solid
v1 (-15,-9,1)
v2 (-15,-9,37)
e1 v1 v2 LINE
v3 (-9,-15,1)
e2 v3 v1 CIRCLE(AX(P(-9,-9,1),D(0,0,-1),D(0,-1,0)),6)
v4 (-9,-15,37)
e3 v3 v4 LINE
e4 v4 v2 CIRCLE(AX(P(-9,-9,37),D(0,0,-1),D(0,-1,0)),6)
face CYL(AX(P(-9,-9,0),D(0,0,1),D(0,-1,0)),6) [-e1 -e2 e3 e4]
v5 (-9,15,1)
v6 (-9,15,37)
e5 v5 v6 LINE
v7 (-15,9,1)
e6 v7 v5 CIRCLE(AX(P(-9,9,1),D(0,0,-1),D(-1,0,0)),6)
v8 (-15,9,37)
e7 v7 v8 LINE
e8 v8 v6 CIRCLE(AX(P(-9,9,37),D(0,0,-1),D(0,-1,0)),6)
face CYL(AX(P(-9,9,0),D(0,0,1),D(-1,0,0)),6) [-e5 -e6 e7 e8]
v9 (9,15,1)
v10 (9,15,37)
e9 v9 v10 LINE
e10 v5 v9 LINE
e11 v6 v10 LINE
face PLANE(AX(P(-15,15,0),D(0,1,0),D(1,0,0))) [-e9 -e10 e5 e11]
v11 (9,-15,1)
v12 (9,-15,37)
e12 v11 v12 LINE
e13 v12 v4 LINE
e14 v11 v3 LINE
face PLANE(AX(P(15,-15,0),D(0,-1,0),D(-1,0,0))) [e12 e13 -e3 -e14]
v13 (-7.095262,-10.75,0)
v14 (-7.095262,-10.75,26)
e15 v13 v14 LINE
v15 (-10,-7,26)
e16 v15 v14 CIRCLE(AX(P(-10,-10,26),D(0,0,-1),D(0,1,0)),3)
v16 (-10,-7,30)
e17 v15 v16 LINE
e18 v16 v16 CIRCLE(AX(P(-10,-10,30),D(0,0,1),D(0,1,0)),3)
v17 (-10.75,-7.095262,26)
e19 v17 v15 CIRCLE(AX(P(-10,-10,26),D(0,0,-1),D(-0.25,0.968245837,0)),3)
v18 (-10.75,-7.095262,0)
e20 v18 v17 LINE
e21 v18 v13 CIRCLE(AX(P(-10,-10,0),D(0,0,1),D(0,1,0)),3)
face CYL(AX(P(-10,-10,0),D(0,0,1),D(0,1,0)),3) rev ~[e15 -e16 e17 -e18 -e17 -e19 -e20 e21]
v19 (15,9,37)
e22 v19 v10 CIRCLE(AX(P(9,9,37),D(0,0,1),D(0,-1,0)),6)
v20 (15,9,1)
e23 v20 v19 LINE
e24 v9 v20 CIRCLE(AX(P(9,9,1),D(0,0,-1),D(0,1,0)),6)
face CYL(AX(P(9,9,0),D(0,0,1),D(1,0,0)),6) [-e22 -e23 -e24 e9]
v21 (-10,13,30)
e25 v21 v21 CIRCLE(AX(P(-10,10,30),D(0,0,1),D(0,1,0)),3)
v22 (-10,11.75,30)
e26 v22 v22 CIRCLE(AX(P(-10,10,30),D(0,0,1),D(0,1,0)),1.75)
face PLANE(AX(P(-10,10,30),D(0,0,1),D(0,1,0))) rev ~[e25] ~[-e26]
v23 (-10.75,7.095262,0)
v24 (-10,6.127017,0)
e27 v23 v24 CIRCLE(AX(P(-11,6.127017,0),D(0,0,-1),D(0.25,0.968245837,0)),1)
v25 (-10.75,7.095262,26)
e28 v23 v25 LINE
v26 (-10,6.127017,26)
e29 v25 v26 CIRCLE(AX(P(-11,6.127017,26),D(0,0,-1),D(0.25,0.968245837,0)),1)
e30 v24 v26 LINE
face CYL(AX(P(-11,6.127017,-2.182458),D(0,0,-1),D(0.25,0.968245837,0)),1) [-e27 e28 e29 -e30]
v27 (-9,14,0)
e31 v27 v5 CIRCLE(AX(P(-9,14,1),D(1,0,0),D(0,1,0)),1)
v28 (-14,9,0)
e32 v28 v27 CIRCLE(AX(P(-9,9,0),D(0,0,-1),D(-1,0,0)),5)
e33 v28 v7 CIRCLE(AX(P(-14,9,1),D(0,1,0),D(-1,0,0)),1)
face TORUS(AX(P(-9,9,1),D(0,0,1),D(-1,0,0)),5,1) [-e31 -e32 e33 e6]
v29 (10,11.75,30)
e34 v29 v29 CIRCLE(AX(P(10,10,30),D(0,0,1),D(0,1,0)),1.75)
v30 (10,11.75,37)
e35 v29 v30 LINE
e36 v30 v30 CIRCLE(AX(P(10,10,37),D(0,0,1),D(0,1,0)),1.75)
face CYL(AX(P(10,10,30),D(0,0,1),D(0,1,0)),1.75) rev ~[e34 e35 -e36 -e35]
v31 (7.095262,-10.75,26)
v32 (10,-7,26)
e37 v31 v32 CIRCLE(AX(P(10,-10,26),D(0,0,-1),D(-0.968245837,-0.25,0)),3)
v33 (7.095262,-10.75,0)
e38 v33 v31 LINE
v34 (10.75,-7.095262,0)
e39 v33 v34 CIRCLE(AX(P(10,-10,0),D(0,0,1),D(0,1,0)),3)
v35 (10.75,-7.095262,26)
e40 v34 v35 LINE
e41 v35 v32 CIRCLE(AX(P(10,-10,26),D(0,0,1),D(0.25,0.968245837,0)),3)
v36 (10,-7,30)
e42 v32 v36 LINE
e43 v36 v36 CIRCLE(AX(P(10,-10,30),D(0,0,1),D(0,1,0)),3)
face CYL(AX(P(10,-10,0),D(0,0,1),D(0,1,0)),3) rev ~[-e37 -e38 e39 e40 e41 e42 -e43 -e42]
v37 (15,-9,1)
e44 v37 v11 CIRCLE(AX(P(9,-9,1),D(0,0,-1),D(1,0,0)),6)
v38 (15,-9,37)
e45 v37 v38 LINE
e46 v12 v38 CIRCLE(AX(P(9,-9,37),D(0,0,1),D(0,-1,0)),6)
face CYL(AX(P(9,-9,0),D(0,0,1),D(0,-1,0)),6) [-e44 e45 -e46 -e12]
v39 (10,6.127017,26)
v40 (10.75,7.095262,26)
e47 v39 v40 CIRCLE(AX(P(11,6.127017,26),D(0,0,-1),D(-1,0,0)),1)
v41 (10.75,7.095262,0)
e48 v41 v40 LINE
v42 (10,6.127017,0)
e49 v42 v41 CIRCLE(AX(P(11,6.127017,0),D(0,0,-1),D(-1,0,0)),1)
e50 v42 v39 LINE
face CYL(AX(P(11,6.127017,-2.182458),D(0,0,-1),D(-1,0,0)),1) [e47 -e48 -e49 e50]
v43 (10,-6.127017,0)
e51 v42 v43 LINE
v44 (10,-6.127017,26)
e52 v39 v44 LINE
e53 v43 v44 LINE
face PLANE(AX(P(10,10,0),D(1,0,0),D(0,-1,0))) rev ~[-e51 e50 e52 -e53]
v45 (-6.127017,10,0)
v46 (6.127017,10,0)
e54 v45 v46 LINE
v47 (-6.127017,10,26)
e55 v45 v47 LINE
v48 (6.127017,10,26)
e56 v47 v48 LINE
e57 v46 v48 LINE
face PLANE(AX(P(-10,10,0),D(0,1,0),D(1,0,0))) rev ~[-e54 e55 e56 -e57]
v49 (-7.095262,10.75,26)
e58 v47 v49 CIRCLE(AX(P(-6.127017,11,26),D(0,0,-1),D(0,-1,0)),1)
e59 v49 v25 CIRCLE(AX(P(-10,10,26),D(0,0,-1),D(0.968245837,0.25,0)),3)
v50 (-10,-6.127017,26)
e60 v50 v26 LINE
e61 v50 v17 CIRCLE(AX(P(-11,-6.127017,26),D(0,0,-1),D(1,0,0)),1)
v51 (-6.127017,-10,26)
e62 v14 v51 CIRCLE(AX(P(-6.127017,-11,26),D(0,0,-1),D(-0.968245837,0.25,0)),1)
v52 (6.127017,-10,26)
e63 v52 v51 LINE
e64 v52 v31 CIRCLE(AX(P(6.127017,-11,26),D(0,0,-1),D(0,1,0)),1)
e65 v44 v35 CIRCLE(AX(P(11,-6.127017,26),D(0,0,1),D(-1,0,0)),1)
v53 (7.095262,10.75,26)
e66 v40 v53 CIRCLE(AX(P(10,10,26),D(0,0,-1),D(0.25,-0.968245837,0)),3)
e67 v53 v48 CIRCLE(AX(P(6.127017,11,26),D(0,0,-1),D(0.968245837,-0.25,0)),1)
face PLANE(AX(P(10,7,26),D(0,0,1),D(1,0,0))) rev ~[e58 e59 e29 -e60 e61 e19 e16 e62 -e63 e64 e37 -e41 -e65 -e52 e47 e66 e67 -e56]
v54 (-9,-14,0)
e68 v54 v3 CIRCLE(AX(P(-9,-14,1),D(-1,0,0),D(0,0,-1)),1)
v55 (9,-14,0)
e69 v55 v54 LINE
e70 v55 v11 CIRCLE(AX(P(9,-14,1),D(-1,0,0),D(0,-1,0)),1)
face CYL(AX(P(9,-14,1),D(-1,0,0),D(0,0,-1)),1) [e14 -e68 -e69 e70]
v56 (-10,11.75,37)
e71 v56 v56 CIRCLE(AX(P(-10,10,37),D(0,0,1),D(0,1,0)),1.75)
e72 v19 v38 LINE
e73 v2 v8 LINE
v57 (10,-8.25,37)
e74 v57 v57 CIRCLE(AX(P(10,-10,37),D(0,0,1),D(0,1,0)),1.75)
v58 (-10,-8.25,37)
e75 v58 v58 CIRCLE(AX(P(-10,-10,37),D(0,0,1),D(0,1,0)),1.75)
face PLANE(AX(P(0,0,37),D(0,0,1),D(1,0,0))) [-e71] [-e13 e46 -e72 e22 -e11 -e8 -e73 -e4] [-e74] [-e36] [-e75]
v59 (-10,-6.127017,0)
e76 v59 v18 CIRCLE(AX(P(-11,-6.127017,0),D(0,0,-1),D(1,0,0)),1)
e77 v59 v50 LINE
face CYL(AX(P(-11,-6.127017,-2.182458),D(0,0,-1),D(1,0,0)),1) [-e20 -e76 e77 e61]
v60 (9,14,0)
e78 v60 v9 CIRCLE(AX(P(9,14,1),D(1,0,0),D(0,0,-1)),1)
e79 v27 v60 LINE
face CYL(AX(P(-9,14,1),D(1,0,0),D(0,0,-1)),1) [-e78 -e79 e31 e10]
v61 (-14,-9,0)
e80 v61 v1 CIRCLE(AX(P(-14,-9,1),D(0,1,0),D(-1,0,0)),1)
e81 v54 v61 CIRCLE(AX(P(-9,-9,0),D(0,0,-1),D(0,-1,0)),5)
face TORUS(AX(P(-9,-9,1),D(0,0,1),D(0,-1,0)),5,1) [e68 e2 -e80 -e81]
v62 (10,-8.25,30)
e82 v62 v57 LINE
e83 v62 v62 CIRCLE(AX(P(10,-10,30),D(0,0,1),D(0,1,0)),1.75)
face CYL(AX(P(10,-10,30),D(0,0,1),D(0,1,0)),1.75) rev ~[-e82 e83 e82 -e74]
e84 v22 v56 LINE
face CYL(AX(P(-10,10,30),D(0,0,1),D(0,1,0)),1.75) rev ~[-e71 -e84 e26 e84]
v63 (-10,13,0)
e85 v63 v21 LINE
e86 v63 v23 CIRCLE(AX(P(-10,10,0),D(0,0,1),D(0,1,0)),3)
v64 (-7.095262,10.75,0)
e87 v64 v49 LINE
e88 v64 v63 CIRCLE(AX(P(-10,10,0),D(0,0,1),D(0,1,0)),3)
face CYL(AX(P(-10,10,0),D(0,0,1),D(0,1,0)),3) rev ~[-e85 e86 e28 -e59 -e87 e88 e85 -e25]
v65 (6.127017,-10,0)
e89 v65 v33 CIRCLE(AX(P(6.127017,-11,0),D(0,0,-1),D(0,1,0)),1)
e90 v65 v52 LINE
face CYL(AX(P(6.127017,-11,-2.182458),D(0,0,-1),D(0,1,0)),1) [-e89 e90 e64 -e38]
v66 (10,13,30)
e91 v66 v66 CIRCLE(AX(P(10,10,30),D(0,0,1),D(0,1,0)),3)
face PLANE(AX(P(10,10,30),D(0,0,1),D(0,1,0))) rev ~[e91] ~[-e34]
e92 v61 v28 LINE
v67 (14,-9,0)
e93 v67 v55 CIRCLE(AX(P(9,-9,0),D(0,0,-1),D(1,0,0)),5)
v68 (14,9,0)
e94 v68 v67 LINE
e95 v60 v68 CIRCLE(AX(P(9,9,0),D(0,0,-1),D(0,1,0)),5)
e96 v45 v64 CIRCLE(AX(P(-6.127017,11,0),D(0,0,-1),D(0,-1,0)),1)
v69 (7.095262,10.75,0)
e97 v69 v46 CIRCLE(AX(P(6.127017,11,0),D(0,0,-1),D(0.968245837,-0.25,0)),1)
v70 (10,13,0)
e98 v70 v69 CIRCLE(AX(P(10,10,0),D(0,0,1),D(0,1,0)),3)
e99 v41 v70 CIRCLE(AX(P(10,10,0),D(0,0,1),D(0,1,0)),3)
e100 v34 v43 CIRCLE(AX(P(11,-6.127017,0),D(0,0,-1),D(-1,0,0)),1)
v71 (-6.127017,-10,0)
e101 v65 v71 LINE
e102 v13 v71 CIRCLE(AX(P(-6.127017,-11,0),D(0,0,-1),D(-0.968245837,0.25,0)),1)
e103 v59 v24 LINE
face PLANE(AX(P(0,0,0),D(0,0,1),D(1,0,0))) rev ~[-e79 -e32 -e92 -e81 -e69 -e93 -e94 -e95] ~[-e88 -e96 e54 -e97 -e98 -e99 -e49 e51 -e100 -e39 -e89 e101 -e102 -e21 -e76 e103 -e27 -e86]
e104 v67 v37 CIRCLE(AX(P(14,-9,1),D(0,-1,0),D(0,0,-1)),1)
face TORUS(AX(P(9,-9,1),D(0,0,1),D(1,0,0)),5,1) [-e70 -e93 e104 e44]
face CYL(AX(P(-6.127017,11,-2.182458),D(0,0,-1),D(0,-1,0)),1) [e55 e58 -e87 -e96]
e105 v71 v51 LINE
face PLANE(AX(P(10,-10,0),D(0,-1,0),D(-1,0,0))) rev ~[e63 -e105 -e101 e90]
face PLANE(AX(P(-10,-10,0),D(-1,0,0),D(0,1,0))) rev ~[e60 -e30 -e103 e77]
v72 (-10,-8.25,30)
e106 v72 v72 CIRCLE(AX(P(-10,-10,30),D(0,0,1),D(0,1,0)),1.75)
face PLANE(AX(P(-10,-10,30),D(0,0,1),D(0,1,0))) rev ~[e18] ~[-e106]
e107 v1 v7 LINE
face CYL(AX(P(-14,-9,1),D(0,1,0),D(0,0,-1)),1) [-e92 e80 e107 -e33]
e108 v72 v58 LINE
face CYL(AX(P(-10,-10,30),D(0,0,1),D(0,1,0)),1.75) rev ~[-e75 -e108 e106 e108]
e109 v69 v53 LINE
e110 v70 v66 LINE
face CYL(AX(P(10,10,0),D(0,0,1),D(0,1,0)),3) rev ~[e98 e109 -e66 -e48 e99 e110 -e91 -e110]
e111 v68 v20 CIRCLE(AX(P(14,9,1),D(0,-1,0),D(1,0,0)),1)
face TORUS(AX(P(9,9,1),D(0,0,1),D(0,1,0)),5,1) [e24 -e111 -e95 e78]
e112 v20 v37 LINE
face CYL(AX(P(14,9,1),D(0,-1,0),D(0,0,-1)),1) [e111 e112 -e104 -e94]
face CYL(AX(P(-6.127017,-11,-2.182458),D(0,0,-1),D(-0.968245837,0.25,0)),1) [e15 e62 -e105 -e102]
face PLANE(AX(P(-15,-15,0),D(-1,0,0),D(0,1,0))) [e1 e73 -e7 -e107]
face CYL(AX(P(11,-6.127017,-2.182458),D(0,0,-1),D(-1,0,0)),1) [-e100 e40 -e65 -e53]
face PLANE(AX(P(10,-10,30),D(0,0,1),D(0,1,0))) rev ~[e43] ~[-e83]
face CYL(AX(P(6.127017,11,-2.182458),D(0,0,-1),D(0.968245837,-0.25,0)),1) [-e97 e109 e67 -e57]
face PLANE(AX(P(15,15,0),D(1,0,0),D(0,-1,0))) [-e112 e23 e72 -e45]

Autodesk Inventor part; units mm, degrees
ref_plane "YZ Plane" through (0, 0, 0) normal (1, 0, 0) x (0, 1, 0)
ref_plane "XZ Plane" through (0, 0, 0) normal (0, 1, 0) x (-1, 0, 0)
ref_plane "XY Plane" through (0, 0, 0) normal (0, 0, 1) x (1, 0, 0)
sketch "Sketch1" plane through (0, 0, 0) normal (0, 0, 1) x (1, 0, 0)
  line L0 (-10, -10) -> (10, -10) construction
  line L1 (10, -10) -> (10, 10) construction
  line L2 (10, 10) -> (-10, 10) construction
  line L3 (-10, 10) -> (-10, -10) construction
  line L4 (-10, -10) -> (10, 10) construction
  line L5 (10, -10) -> (-10, 10) construction
  line L6 (15, -15) -> (-15, -15)
  line L7 (-15, -15) -> (-15, 15)
  line L8 (-15, 15) -> (15, 15)
  line L9 (15, 15) -> (15, -15)
  line L10 (15, -15) -> (-15, 15) construction
  line L11 (-15, -15) -> (15, 15) construction
  line L12 (10, -10) -> (-10, -10)
  line L13 (-10, -10) -> (-10, 10)
  line L14 (-10, 10) -> (10, 10)
  line L15 (10, 10) -> (10, -10)
  line L16 (10, -10) -> (-10, 10) construction
  line L17 (-10, -10) -> (10, 10) construction
  point P0 (0, 0)
  dimension "d0" = 20
  dimension "d1" = 20
  dimension "d2" = 30
  dimension "d3" = 30
extrude "Extrusion1" add sketch "Sketch1" along normal blind 37 contours L6 L7 L8 L9 | L12 L13 L14 L15
extrude "Extrusion2" cut sketch "Sketch1" along normal blind 26 contours L12 L13 L14 L15
hole "Hole1" at (-10, 10, 0) at (10, 10, 0) at (10, -10, 0) at (-10, -10, 0) direction (0, 0, 1) diameter 3.5 end through all counterbore diameter 6 counterbore depth 30
fillet "Fillet1" radius 6 4 edges at (15, -15, 18.5) (15, 15, 18.5) (-15, 15, 18.5) (-15, -15, 18.5)
fillet "Fillet2" radius 1 8 edges at (7, 10, 13) (-7, 10, 13) (10, -7, 13) (-10, -7, 13) (10, 7, 13) (-10, 7, 13) (7, -10, 13) (-7, -10, 13)
fillet "Fillet3" radius 1 8 edges at (-13.2426, 13.2426, 0) (0, 15, 0) (13.2426, 13.2426, 0) (15, 0, 0) (13.2426, -13.2426, 0) (0, -15, 0) (-13.2426, -13.2426, 0) (-15, 0, 0)
equation "\"d3\" = d2"
properties part number "2point_linear_connector"
